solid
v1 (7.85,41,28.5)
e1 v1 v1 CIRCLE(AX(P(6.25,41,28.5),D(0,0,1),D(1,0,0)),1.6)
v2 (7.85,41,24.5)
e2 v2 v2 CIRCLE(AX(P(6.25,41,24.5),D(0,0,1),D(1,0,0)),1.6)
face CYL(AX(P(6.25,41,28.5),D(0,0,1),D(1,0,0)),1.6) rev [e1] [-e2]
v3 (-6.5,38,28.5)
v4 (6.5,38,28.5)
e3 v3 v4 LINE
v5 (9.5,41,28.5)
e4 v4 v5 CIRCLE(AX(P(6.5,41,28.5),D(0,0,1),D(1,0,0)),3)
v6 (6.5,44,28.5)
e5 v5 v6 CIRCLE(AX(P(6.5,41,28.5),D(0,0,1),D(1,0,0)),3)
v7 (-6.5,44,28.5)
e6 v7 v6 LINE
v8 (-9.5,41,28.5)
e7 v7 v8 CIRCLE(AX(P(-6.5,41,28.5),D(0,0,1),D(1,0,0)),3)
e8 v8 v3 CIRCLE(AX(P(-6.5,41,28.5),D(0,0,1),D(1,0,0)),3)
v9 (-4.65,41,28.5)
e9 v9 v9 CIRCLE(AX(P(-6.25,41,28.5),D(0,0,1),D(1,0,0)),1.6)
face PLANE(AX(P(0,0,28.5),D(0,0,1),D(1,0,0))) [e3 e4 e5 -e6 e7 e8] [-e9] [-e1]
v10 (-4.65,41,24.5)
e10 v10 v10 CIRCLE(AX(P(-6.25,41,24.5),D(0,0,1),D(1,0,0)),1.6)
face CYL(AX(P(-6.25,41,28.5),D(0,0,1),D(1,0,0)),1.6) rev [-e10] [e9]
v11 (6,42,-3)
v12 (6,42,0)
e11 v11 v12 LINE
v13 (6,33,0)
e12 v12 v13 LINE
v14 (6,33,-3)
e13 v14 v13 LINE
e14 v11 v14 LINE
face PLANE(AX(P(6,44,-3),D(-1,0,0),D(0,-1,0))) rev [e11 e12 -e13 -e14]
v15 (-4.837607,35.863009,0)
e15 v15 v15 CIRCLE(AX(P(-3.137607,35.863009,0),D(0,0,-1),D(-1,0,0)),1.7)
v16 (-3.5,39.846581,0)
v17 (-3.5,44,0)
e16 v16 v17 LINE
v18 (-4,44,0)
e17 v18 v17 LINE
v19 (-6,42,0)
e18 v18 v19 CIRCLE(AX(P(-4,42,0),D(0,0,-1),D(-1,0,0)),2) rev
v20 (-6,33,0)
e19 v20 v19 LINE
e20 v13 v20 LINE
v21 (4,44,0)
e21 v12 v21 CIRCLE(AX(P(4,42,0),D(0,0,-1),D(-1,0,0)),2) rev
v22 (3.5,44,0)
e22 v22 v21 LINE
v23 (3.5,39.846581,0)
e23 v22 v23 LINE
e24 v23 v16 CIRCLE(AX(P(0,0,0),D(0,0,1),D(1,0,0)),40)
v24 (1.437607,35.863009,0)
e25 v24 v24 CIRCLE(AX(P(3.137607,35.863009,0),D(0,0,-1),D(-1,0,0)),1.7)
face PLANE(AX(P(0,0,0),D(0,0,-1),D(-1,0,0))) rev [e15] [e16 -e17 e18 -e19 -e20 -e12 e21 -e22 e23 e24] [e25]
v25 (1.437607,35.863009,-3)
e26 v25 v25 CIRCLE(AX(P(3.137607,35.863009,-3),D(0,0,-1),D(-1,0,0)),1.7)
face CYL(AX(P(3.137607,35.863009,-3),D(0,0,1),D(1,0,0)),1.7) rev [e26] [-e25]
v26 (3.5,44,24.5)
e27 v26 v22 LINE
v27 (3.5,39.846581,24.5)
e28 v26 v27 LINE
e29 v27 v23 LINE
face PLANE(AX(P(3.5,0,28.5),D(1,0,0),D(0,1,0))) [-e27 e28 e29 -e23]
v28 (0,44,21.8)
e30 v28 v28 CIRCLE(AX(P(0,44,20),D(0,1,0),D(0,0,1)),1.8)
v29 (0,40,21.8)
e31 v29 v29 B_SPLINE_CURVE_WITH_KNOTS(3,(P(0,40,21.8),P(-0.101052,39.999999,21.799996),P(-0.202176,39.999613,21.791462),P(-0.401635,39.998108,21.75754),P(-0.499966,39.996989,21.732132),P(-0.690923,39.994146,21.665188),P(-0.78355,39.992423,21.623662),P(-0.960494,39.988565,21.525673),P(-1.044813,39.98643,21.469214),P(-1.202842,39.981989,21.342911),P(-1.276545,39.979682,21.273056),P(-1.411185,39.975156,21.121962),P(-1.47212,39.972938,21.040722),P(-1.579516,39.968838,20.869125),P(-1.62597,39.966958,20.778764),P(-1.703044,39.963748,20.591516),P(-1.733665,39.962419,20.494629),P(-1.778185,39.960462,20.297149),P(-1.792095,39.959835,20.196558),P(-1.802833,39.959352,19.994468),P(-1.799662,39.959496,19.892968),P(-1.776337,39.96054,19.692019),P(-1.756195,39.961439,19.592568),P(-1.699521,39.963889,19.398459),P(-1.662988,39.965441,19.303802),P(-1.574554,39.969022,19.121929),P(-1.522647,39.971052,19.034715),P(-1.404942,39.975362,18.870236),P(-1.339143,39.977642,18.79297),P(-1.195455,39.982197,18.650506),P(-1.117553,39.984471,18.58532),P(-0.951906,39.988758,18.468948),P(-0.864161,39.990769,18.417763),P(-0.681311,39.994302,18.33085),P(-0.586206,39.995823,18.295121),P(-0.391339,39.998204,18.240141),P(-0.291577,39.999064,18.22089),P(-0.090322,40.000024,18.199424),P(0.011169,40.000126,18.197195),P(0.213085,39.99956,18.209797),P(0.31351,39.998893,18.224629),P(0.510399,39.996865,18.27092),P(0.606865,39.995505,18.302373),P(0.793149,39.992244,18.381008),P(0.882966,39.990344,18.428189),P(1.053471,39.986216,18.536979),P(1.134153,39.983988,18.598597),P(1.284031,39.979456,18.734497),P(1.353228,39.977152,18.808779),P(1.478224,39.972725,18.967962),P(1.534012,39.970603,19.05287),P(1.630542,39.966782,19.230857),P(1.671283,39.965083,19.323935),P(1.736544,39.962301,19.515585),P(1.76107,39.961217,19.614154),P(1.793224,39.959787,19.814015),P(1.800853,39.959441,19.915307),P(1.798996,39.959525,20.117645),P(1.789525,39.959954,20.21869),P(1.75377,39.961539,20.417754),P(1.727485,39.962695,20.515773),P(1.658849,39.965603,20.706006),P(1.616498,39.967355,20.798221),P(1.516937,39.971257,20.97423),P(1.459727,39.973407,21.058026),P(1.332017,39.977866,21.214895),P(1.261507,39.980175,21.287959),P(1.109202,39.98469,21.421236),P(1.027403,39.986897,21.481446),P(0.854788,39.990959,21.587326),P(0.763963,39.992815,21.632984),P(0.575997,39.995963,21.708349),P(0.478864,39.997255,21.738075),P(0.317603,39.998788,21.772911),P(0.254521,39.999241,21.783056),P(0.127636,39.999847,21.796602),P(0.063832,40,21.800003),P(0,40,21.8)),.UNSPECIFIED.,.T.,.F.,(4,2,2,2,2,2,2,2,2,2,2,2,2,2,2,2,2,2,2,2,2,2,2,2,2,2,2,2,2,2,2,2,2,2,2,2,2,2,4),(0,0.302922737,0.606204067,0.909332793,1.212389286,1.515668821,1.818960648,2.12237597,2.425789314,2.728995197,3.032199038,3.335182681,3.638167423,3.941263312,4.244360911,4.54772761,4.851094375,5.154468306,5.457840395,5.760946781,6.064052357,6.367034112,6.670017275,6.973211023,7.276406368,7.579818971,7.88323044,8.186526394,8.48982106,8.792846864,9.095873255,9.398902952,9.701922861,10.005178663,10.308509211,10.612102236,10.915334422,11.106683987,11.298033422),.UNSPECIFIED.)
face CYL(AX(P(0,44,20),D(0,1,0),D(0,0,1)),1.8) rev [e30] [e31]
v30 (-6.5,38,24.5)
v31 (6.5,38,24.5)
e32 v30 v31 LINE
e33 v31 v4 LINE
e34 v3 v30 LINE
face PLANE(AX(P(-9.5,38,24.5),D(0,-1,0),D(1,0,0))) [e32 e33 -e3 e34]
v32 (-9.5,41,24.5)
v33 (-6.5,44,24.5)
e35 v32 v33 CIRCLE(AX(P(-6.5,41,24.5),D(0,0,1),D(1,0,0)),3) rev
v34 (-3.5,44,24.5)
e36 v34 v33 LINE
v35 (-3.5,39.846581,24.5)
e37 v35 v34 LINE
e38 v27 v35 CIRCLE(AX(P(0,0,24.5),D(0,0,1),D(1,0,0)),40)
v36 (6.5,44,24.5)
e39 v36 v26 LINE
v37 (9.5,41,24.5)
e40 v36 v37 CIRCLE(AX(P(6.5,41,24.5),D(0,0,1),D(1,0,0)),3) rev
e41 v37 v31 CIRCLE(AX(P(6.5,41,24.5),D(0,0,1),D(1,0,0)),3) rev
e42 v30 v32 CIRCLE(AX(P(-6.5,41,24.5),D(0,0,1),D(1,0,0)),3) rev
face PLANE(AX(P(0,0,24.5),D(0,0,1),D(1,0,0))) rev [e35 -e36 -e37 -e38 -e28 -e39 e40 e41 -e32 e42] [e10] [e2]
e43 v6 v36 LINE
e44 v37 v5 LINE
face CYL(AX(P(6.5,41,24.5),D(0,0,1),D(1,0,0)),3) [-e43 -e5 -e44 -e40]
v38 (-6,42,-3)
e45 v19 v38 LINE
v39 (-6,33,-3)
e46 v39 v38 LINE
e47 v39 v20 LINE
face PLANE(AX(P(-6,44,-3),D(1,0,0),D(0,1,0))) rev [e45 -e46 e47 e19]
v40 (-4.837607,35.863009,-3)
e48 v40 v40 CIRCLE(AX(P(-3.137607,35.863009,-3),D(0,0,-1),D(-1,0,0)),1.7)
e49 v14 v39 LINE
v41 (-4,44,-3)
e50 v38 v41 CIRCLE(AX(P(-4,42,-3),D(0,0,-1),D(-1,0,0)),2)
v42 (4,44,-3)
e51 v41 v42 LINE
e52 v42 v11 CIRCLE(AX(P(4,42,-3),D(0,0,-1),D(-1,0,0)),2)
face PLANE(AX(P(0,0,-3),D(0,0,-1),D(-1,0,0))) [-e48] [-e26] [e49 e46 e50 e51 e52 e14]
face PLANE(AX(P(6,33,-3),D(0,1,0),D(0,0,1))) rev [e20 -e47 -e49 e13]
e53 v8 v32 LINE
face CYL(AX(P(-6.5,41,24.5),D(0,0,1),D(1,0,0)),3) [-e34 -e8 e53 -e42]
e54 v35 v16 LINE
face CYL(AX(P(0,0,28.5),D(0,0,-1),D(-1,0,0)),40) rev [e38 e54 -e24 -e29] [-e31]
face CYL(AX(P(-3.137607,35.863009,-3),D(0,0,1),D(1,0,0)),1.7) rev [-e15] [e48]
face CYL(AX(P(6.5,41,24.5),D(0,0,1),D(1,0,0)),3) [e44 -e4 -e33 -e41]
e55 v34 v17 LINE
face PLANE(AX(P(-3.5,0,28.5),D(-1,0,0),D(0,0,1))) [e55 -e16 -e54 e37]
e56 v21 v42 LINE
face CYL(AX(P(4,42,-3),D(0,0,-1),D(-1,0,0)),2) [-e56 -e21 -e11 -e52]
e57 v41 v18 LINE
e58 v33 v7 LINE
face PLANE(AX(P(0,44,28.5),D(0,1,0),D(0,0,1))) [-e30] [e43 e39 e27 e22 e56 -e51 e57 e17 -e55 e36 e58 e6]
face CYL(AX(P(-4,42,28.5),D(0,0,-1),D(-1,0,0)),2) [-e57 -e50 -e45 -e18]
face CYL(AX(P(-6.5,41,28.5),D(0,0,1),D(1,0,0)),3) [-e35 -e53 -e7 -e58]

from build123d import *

# Parameters (mm, degrees)
BOSS_EXTRUDE1_DEPTH      = 28.5
SKETCH2_W                = 12
SKETCH2_H                = 11
SKETCH2_R                = 1.7
BOSS_EXTRUDE2_DEPTH      = 3
SKETCH3_W                = 19
SKETCH3_H                = 6
BOSS_EXTRUDE3_DEPTH      = 4
M3_CLEARANCE_HOLE1_D     = 3.2
M3_CLEARANCE_HOLE1_DEPTH = 4
FILLET1_R                = 3
M3_CLEARANCE_HOLE2_D     = 3.6
FILLET2_R                = 2


with BuildPart() as part:
    # Sketch1 → Boss-Extrude1 (new body)
    with BuildSketch(Plane.XY):
        with BuildLine():
            Line((-3.5, 44), (-3.5, 39.846580782))
            ThreePointArc((-3.5, 39.846580782), (0, 40), (3.5, 39.846580782))
            Line((3.5, 39.846580782), (3.5, 44))
            Line((3.5, 44), (-3.5, 44))
        make_face()
    extrude(amount=BOSS_EXTRUDE1_DEPTH)

    # Sketch2 → Boss-Extrude2 (add)
    with BuildSketch(Plane(origin=(0, 0, 0), x_dir=(-1, 0, 0), z_dir=(0, 0, -1))):
        with Locations((0, 38.5)):
            Rectangle(SKETCH2_W, SKETCH2_H)
        with Locations((-3.137606739, 35.863009131)):
            Circle(SKETCH2_R, mode=Mode.SUBTRACT)
        with Locations((3.137606739, 35.863009131)):
            Circle(SKETCH2_R, mode=Mode.SUBTRACT)
    extrude(amount=BOSS_EXTRUDE2_DEPTH)

    # Sketch3 → Boss-Extrude3 (add)
    with BuildSketch(Plane.XY.offset(28.5)):
        with Locations((0, 41)):
            Rectangle(SKETCH3_W, SKETCH3_H)
    extrude(amount=-BOSS_EXTRUDE3_DEPTH)

    # M3 Clearance Hole1
    with Locations(Plane.XY.offset(28.5)):
        with Locations((-6.25, 41), (6.25, 41)):
            Hole(M3_CLEARANCE_HOLE1_D / 2, depth=M3_CLEARANCE_HOLE1_DEPTH)

    # Fillet1
    fillet1_edges = [part.edges().sort_by_distance(p)[0] for p in [
        (9.5, 38, 26.5),
        (9.5, 44, 26.5),
        (-9.5, 38, 26.5),
        (-9.5, 44, 26.5),
    ]]
    fillet(fillet1_edges, radius=FILLET1_R - 0.0001)  # a hair under: the kernel refuses the full size

    # M3 Clearance Hole2 (through all)
    with Locations(Plane(origin=(0, 44, 0), x_dir=(1, 0, 0), z_dir=(0, 1, 0))):
        with Locations((0, -20)):
            Hole(M3_CLEARANCE_HOLE2_D / 2)

    # Fillet2
    fillet2_edges = [part.edges().sort_by_distance(p)[0] for p in [
        (6, 44, -1.5),
        (-6, 44, -1.5),
    ]]
    fillet(fillet2_edges, radius=FILLET2_R)


solid = part.part
